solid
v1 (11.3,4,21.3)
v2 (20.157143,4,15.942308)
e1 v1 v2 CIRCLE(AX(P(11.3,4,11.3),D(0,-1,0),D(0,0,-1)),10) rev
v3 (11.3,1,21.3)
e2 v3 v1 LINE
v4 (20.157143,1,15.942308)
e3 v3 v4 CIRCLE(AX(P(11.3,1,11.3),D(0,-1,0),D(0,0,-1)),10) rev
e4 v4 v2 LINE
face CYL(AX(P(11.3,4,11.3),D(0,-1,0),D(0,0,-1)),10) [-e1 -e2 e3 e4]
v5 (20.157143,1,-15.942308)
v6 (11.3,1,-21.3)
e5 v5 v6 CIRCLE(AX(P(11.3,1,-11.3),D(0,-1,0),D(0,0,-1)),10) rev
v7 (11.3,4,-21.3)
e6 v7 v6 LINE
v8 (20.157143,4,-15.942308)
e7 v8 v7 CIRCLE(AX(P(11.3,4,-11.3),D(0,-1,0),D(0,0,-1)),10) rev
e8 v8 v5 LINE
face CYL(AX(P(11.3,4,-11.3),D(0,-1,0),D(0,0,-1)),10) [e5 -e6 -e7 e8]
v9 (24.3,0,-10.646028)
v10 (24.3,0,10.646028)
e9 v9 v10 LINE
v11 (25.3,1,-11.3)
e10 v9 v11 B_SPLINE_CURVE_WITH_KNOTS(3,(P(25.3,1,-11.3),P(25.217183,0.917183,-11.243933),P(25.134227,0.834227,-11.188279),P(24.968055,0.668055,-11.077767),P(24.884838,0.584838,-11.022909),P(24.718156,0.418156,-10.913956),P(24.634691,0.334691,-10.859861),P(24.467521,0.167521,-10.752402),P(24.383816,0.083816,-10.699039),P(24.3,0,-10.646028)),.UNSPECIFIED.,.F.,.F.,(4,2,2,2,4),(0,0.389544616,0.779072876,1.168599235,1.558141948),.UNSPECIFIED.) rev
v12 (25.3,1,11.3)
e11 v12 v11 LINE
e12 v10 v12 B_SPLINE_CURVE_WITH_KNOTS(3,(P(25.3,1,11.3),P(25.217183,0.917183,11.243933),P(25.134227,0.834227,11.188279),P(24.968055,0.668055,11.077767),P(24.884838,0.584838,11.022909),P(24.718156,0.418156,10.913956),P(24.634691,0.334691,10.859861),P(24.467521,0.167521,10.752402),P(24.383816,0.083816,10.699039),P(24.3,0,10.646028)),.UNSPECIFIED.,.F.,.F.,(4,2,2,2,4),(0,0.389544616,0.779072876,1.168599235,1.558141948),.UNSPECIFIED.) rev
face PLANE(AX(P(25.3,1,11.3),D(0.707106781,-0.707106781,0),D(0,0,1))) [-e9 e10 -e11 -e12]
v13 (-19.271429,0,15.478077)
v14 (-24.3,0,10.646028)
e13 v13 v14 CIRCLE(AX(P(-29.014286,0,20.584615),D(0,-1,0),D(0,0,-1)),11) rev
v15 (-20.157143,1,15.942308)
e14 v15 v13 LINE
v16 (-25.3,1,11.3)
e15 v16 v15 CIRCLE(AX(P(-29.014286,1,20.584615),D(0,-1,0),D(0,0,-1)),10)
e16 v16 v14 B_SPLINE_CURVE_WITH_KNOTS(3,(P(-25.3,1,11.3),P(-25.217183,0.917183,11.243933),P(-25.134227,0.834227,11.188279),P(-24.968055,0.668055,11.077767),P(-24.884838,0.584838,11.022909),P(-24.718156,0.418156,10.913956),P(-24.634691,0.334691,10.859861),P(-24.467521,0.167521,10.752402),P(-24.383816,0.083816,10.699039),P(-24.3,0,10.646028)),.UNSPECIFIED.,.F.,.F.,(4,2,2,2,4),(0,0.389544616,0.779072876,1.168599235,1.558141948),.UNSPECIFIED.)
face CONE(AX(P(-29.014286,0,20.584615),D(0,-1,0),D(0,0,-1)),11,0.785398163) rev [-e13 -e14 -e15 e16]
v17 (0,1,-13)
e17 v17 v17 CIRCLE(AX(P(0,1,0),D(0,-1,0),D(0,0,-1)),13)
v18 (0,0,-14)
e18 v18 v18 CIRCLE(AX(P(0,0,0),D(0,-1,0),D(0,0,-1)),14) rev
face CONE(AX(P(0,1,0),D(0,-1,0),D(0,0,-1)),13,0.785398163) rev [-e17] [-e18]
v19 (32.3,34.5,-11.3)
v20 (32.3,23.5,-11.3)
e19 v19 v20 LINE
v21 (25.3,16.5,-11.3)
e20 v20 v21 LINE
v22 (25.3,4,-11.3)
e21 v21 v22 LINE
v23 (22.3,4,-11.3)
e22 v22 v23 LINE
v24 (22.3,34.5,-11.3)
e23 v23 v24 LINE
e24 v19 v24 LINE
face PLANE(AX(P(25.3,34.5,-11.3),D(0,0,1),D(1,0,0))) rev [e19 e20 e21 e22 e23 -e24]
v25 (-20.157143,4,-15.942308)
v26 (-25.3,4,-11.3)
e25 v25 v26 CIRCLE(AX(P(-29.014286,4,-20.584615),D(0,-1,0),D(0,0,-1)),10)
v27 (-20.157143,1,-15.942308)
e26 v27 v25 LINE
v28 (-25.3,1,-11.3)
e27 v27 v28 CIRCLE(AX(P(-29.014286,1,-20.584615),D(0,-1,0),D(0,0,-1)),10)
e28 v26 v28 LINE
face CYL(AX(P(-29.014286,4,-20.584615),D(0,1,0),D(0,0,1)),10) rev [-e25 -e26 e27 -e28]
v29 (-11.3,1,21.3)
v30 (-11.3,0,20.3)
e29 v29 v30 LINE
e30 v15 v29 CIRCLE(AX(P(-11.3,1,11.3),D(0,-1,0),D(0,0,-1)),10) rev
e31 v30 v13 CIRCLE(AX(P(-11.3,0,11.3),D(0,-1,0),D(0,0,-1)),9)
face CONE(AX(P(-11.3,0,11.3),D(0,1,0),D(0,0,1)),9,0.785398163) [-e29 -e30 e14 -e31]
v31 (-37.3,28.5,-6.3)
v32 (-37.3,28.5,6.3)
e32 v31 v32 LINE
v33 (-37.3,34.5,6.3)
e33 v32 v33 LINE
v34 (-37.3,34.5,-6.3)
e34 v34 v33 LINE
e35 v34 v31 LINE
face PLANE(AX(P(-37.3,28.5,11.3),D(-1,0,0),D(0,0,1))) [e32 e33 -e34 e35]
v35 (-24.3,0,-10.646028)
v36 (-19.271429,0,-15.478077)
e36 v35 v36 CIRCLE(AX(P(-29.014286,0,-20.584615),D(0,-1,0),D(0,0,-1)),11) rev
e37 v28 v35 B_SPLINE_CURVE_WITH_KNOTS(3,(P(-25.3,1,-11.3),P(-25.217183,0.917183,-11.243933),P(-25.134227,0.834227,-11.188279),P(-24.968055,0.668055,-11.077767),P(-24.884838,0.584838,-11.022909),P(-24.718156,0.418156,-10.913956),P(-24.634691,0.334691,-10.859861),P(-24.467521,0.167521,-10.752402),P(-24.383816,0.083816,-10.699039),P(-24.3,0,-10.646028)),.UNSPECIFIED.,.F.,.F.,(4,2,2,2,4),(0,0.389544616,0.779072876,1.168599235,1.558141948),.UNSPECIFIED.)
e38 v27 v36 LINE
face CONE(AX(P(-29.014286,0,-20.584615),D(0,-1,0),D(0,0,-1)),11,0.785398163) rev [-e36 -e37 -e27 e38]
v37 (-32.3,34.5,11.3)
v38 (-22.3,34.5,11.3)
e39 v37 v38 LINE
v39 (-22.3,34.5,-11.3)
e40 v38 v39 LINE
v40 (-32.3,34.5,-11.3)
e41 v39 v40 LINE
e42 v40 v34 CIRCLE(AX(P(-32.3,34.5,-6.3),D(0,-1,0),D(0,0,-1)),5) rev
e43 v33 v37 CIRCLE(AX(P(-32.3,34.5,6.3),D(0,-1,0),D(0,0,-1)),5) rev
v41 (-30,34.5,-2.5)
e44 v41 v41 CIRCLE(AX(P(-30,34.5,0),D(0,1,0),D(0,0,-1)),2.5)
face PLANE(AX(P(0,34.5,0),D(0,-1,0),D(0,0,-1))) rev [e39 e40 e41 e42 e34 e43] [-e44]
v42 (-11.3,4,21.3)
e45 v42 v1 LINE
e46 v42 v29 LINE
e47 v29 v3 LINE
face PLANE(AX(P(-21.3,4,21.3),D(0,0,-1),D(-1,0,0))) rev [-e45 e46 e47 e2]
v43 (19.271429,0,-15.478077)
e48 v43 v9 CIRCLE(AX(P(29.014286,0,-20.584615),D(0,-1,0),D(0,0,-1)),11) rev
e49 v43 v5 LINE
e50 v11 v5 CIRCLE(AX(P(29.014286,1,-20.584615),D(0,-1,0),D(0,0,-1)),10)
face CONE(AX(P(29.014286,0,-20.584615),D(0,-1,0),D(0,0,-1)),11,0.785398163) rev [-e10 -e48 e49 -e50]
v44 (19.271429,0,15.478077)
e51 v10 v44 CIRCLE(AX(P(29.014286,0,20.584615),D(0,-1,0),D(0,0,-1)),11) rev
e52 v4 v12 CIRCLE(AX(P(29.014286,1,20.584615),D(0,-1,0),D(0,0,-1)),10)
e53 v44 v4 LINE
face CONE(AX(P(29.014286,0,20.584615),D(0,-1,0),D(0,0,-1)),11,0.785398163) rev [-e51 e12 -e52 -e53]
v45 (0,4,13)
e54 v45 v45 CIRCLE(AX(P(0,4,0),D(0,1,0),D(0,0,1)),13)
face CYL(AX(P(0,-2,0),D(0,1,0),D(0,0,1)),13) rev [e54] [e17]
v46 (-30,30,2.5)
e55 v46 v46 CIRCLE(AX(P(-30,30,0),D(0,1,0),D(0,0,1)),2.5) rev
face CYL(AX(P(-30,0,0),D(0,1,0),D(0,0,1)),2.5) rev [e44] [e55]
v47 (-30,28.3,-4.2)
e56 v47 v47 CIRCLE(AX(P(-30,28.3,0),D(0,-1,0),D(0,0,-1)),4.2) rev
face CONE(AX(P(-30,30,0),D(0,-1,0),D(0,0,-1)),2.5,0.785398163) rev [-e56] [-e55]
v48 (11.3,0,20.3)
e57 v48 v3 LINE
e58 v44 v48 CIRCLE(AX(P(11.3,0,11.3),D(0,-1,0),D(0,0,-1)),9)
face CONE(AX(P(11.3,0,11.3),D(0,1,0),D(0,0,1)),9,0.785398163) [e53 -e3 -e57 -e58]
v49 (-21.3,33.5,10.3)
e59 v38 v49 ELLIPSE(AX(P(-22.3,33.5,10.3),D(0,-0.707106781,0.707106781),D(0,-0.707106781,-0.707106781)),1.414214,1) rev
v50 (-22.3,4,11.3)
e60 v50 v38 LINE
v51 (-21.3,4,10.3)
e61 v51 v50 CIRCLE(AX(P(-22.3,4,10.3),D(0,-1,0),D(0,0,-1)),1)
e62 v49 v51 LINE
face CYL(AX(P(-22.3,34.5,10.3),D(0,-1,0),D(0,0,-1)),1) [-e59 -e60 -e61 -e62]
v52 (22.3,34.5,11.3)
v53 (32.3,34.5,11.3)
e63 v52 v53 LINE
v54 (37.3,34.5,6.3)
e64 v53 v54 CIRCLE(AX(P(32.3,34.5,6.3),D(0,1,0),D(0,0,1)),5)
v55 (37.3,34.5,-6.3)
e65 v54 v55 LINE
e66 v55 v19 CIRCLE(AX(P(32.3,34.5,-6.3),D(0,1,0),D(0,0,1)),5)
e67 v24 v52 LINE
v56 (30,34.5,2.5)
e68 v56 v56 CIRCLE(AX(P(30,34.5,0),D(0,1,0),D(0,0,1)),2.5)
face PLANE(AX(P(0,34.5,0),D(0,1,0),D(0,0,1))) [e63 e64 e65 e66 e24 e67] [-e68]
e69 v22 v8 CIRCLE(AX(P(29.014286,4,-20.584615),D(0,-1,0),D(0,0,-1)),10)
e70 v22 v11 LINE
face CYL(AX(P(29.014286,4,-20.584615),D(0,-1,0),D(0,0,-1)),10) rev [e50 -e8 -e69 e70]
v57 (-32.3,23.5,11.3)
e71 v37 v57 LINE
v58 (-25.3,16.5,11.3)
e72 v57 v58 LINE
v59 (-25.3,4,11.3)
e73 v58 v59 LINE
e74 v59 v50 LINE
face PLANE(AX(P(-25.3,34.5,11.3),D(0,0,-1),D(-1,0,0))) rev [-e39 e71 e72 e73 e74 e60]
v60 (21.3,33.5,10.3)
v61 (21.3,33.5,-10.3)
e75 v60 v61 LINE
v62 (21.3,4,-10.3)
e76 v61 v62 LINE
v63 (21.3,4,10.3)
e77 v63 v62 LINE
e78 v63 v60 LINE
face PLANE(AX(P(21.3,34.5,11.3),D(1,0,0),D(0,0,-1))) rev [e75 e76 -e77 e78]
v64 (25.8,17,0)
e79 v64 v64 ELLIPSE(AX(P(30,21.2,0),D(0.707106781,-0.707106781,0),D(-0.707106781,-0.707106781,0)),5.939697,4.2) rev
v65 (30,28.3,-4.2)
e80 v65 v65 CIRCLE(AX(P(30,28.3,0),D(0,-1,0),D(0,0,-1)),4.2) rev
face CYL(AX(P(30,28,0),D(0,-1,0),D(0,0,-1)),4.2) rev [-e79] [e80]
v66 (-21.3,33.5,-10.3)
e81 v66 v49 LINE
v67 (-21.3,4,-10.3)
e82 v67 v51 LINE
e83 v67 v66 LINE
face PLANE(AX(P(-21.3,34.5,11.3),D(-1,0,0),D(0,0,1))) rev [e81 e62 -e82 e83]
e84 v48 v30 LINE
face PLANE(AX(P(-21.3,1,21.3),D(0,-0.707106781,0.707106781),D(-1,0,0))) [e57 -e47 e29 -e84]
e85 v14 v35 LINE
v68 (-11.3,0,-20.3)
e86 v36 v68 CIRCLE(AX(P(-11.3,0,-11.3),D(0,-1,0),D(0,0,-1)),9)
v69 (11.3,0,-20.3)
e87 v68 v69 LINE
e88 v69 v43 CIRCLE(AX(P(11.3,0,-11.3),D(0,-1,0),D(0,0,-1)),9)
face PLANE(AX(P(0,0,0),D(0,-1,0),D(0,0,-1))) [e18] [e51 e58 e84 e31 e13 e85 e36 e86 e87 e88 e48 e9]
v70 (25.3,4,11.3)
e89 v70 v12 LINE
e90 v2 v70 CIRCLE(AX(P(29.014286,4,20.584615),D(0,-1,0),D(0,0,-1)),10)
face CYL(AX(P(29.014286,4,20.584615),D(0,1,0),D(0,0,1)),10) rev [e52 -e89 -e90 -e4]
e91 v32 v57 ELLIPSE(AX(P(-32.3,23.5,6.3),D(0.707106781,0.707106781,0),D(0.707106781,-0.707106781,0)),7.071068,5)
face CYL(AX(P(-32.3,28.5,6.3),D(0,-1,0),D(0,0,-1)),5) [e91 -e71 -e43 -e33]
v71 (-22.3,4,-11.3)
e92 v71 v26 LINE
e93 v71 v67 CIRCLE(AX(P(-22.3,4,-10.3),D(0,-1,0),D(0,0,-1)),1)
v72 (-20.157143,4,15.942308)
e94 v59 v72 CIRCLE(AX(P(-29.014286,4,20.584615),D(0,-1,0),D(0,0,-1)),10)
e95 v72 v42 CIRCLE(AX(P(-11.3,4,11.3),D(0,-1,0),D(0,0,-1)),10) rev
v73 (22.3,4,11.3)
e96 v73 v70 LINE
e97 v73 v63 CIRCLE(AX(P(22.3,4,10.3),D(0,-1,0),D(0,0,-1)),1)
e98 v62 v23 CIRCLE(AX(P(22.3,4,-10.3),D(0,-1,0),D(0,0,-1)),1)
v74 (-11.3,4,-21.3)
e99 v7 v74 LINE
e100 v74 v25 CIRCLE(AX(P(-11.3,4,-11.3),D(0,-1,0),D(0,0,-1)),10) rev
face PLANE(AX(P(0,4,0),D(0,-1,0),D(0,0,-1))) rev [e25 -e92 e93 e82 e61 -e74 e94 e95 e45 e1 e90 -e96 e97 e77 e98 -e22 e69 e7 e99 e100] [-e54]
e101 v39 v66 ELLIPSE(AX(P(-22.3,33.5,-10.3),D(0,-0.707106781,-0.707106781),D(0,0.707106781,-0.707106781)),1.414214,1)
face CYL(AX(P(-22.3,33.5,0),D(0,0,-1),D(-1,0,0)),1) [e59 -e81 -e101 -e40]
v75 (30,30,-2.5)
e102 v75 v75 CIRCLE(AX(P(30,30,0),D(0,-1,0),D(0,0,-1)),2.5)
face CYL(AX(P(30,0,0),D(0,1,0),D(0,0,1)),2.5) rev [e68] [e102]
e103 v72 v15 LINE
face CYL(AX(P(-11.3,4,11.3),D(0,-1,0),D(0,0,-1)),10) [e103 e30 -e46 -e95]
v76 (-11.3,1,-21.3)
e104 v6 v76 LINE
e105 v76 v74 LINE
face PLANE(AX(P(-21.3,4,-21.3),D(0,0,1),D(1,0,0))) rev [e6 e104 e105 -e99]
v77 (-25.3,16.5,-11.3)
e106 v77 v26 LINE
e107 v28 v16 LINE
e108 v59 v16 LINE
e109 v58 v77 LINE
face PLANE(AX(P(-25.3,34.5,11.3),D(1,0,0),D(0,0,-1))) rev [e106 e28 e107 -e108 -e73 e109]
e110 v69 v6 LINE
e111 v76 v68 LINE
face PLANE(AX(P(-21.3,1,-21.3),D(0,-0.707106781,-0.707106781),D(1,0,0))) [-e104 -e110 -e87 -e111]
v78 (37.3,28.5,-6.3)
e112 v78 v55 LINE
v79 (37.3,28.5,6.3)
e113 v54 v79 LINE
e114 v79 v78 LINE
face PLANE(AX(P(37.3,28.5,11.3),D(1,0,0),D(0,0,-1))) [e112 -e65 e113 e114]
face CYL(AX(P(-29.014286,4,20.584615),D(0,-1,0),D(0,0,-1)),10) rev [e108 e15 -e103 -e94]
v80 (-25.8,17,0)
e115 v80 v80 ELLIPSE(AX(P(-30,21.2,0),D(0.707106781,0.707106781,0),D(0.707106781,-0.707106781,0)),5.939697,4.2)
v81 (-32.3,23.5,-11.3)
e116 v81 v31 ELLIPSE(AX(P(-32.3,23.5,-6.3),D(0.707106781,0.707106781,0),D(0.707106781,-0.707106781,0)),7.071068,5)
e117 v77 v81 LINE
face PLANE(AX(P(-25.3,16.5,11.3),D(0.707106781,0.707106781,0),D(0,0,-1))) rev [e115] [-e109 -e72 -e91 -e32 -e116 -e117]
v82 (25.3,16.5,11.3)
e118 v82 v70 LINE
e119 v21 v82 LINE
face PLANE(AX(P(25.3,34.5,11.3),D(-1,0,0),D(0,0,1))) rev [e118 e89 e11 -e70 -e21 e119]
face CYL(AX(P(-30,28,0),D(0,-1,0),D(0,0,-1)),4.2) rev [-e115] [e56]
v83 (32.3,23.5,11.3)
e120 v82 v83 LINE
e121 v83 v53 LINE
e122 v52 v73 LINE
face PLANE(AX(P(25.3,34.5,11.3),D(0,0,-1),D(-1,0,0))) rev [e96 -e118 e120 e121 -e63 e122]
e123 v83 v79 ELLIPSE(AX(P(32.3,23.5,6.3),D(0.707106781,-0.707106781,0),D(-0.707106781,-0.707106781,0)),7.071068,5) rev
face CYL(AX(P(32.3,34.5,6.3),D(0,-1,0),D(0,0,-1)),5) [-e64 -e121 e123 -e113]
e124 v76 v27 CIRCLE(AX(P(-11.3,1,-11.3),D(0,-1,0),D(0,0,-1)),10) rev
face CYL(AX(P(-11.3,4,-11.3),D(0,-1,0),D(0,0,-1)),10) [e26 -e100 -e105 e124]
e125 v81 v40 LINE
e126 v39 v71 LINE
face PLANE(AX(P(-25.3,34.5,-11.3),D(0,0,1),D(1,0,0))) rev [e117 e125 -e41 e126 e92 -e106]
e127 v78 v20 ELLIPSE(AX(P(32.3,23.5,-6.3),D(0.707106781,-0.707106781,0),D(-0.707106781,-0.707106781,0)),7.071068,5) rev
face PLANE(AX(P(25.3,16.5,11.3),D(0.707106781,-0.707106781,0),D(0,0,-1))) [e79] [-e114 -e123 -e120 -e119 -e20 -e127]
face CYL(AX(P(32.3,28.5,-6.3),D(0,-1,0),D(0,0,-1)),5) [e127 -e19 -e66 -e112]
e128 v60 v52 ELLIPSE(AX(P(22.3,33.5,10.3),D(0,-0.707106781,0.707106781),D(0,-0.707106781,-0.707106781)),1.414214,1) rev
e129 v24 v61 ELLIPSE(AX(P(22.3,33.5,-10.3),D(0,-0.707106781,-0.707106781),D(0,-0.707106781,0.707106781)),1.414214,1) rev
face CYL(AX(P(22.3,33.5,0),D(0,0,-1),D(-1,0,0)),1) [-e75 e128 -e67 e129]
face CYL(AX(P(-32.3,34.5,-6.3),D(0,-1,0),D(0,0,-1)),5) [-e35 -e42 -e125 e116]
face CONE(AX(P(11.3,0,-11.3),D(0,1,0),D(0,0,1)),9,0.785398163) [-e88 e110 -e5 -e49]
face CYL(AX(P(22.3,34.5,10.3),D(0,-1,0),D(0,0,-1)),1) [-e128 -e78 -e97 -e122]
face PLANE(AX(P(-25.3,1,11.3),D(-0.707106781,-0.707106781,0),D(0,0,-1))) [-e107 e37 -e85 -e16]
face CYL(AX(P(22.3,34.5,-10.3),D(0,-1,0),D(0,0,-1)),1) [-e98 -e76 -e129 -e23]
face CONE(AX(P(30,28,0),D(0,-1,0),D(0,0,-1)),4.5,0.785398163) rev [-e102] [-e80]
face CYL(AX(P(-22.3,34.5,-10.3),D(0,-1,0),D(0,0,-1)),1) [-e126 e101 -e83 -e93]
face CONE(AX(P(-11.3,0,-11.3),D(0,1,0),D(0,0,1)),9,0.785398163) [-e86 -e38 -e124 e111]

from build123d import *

# Parameters (mm, degrees)
SKETCH_1_W            = 42.6
SKETCH_1_H            = 42.6
EXTRUDE_1_DEPTH       = 4
SKETCH_2_R            = 13
CUT_EXTRUDE_1_DEPTH   = 6
FILLET_1_R            = 10
SKETCH_3_W            = 4
SKETCH_3_H            = 22.6
EXTRUDE_2_DEPTH       = 34.5
FILLET_2_R            = 10
SKETCH_4_W            = 12
SKETCH_4_H            = 22.6
EXTRUDE_3_DEPTH       = 6
FILLET_3_R            = 5
FILLET_4_R            = 1
CHAMFER_3_SIZE        = 1
SKETCH_5_R            = 2.5
CUT_EXTRUDE_2_DEPTH   = 56.092921505
CHAMFER_START         = -9.101924
CHAMFER_4_DEPTH       = 6.602294476
CHAMFER_START_2       = 2.5000001
CHAMFER_4_2_DEPTH     = 6.6019239
CHAMFER_START_3       = -2.499629524
CHAMFER_4_3_DEPTH     = 4.999629624
CHAMFER_START_4       = -11.3
CHAMFER_4_4_DEPTH     = 2.198076
CHAMFER_START_5       = 9.101924
CHAMFER_4_5_DEPTH     = 2.198076
CHAMFER_START_6       = 16.5
CHAMFER_4_6_OUTLINE_R = 2.5
CHAMFER_4_6_DEPTH     = 12
SKETCH_6_R            = 4.2
CUT_EXTRUDE_5_DEPTH   = 28


with BuildPart() as part:
    # Эскиз1 → Бобышка-Вытянуть1 (new body)
    with BuildSketch(Plane(origin=(0, 0, 0), x_dir=(1, 0, 0), z_dir=(0, 1, 0))):
        Rectangle(SKETCH_1_W, SKETCH_1_H)
    extrude(amount=EXTRUDE_1_DEPTH)

    # Эскиз2 → Вырез-Вытянуть1 (cut)
    with BuildSketch(Plane(origin=(0, 4, 0), x_dir=(1, 0, 0), z_dir=(0, 1, 0))):
        with Locations(Location((0, 0, 0), (0, 0, 270))):
            Circle(SKETCH_2_R)
    extrude(amount=-CUT_EXTRUDE_1_DEPTH, mode=Mode.SUBTRACT)

    # Скругление1
    fillet_1_edges = [part.edges().sort_by_distance(p)[0] for p in [
        (21.3, 2, 21.3),
        (-21.3, 2, 21.3),
        (-21.3, 2, -21.3),
        (21.3, 2, -21.3),
    ]]
    fillet(fillet_1_edges, radius=FILLET_1_R)

    # Эскиз3 → Бобышка-Вытянуть2 (add)
    with BuildSketch(Plane(origin=(0, 0, 0), x_dir=(1, 0, 0), z_dir=(0, 1, 0))):
        with Locations((-23.3, 0)):
            Rectangle(SKETCH_3_W, SKETCH_3_H)
        with Locations((23.3, 0)):
            Rectangle(SKETCH_3_W, SKETCH_3_H)
    extrude(amount=EXTRUDE_2_DEPTH)

    # Скругление2
    # the kernel refuses this fillet: 10 mm, written as the material it adds along each edge
    with BuildSketch(Plane(origin=(21.3, 0, -11.3), x_dir=(-0.23904572186687842, 0, -0.9710083124552246), z_dir=(0, 1, 0)), Plane(origin=(-21.3, 0, 11.3), x_dir=(0.2390457218668792, 0, 0.9710083124552243), z_dir=(0, 1, 0))) as fillet_2_piece_1:
        with BuildLine():
            CenterArc((7.171371656, -9.710083125), FILLET_2_R, 103.83022495, 40.535802111)
            Line((-0.956182887, -3.88403325), (0, 0))
            ThreePointArc((0, 0), (2.390457219, -0.289916875), (4.780914437, 0))
        make_face()
    extrude(amount=4)
    with BuildSketch(Plane(origin=(-21.3, 0, -11.3), x_dir=(0.23904572186687842, 0, -0.9710083124552246), z_dir=(0, 1, 0)), Plane(origin=(21.3, 0, 11.3), x_dir=(-0.2390457218668792, 0, 0.9710083124552243), z_dir=(0, 1, 0))) as fillet_2_piece_2:
        with BuildLine():
            CenterArc((7.171371656, 9.710083125), FILLET_2_R, 215.633972939, 40.535802111)
            Line((-0.956182887, 3.88403325), (0, 0))
            ThreePointArc((0, 0), (2.390457219, 0.289916875), (4.780914437, 0))
        make_face()
    extrude(amount=4)

    # Эскиз4 → Бобышка-Вытянуть3 (add)
    with BuildSketch(Plane(origin=(0, 34.5, 0), x_dir=(1, 0, 0), z_dir=(0, 1, 0))):
        with Locations((-31.3, 0)):
            Rectangle(SKETCH_4_W, SKETCH_4_H)
        with Locations((31.3, 0)):
            Rectangle(SKETCH_4_W, SKETCH_4_H)
    extrude(amount=-EXTRUDE_3_DEPTH)

    # Скругление3
    fillet_3_edges = [part.edges().sort_by_distance(p)[0] for p in [
        (37.3, 31.5, -11.3),
        (37.3, 31.5, 11.3),
        (-37.3, 31.5, 11.3),
        (-37.3, 31.5, -11.3),
    ]]
    fillet(fillet_3_edges, radius=FILLET_3_R)

    # Скругление4
    fillet_4_edges = [part.edges().sort_by_distance(p)[0] for p in [
        (21.3, 19.25, -11.3),
        (21.3, 19.25, 11.3),
        (21.3, 34.5, 0),
        (-21.3, 19.25, 11.3),
        (-21.3, 19.25, -11.3),
        (-21.3, 34.5, 0),
    ]]
    fillet(fillet_4_edges, radius=FILLET_4_R)

    # Фаска3
    chamfer_3_edges = [part.edges().sort_by_distance(p)[0] for p in [
        (0, 0, -13),
        (0, 0, 21.3),
        (0, 0, -21.3),
        (16.475757114, 0, -19.856374133),
        (-16.475757114, 0, 19.856374133),
        (25.3, 0, 0),
        (-25.3, 0, 0),
        (-16.475757114, 0, -19.856374133),
        (16.475757114, 0, 19.856374133),
        (22.313691772, 0, -13.16154043),
        (-22.313691772, 0, -13.16154043),
        (-22.313691772, 0, 13.16154043),
        (22.313691772, 0, 13.16154043),
    ]]
    chamfer(chamfer_3_edges, length=CHAMFER_3_SIZE)

    # Эскиз5 → Вырез-Вытянуть2 (cut, through all)
    with BuildSketch(Plane(origin=(0, 34.5, 0), x_dir=(1, 0, 0), z_dir=(0, 1, 0))):
        with Locations(Location((30, 0, 0), (0, 0, 270))):
            Circle(SKETCH_5_R)
        with Locations(Location((-30, 0, 0), (0, 0, 90))):
            Circle(SKETCH_5_R)
    extrude(amount=-CUT_EXTRUDE_2_DEPTH, mode=Mode.SUBTRACT)

    # Фаска4: read off the stored shape, not the designer's step
    # Фаска4 outline → Фаска4 (add)
    with BuildSketch(Plane.XY.offset(CHAMFER_START)):
        Polygon((-37.3, 28.5), (-25.3, 16.5), (-25.3, 28.5), align=None)
        Polygon((25.3, 28.5), (25.3, 16.5), (37.3, 28.5), align=None)
    extrude(amount=CHAMFER_4_DEPTH)

    # Chamfer 4 2 outline → Chamfer 4 2 (add)
    with BuildSketch(Plane.XY.offset(CHAMFER_START_2)):
        Polygon((-37.3, 28.5), (-25.3, 16.5), (-25.3, 28.5), align=None)
        Polygon((25.3, 28.5), (25.3, 16.5), (37.3, 28.5), align=None)
    extrude(amount=CHAMFER_4_2_DEPTH)

    # Chamfer 4 3 outline → Chamfer 4 3 (add)
    with BuildSketch(Plane.XY.offset(CHAMFER_START_3)):
        Polygon((-37.3, 28.5), (-25.3, 16.5), (-25.3, 28.5), align=None)
        Polygon((25.3, 28.5), (25.3, 16.5), (37.3, 28.5), align=None)
    extrude(amount=CHAMFER_4_3_DEPTH)

    # Chamfer 4 4 outline → Chamfer 4 4 (add)
    with BuildSketch(Plane.XY.offset(CHAMFER_START_4)):
        Polygon((-37.3, 28.5), (-25.3, 16.5), (-25.3, 28.5), align=None)
        Polygon((25.3, 28.5), (25.3, 16.5), (37.3, 28.5), align=None)
    extrude(amount=CHAMFER_4_4_DEPTH)

    # Chamfer 4 5 outline → Chamfer 4 5 (add)
    with BuildSketch(Plane.XY.offset(CHAMFER_START_5)):
        Polygon((-37.3, 28.5), (-25.3, 16.5), (-25.3, 28.5), align=None)
        Polygon((25.3, 28.5), (25.3, 16.5), (37.3, 28.5), align=None)
    extrude(amount=CHAMFER_4_5_DEPTH)

    # Chamfer 4 6 outline → Chamfer 4 6 (cut)
    with BuildSketch(Plane(origin=(0, 0, 0), x_dir=(1, 0, 0), z_dir=(0, 1, 0)).offset(CHAMFER_START_6)):
        with BuildLine():
            Line((37.299999999, -11.3), (37.3, -6.3))
            ThreePointArc((37.3, -6.3), (35.835533906, -9.835533906), (32.3, -11.3))
            Line((32.3, -11.3), (37.299999999, -11.3))
        make_face()
        with BuildLine():
            ThreePointArc((32.3, 11.3), (35.835533906, 9.835533906), (37.3, 6.3))
            Line((37.3, 6.3), (37.299999999, 11.3))
            Line((37.299999999, 11.3), (32.3, 11.3))
        make_face()
        with BuildLine():
            Line((-37.3, -11.3), (-32.3, -11.3))
            ThreePointArc((-32.3, -11.3), (-35.835533906, -9.835533906), (-37.3, -6.3))
            Line((-37.3, -6.3), (-37.3, -11.3))
        make_face()
        with BuildLine():
            ThreePointArc((-37.3, 6.3), (-35.835533906, 9.835533906), (-32.3, 11.3))
            Line((-32.3, 11.3), (-37.3, 11.3))
            Line((-37.3, 11.3), (-37.3, 6.3))
        make_face()
        with Locations((-30, 0)):
            Circle(CHAMFER_4_6_OUTLINE_R)
        with Locations((30, 0)):
            Circle(CHAMFER_4_6_OUTLINE_R)
    extrude(amount=CHAMFER_4_6_DEPTH, mode=Mode.SUBTRACT)

    # Эскиз6 → Вырез-Вытянуть5 (cut)
    with BuildSketch(Plane.XZ):
        with Locations(Location((30, 0, 0), (0, 0, 270))):
            Circle(SKETCH_6_R)
        with Locations((-30, 0)):
            Circle(SKETCH_6_R)
    extrude(amount=-CUT_EXTRUDE_5_DEPTH, mode=Mode.SUBTRACT)

    # Фаска5
    # the kernel refuses this chamfer: 2 mm, written as the material it takes off along each edge
    with BuildSketch(Plane(origin=(30, 28, 0), x_dir=(1, 0, 0), z_dir=(0, 0, -1))) as chamfer_5_piece_1_section:
        with BuildLine():
            Line((4.556568542, 0.056568542), (2.443431458, -2.056568542))
            Line((2.443431458, -2.056568542), (2.403431458, -2.056568542))
            ThreePointArc((2.403431458, -2.056568542), (2.46, -1.028284271), (2.46, 0))
            Line((2.46, 0), (2.5, 0.04))
            ThreePointArc((2.5, 0.04), (3.528284271, 0.04), (4.556568542, 0.096568542))
            Line((4.556568542, 0.096568542), (4.556568542, 0.056568542))
        make_face()
    chamfer_5_piece_1 = revolve(axis=Axis((30, 28, 0), (0, -1, 0)), mode=Mode.PRIVATE)
    chamfer_5_piece_1 = chamfer_5_piece_1 & Plane(origin=(30, 28, 0), x_dir=(0, 0, -1), z_dir=(0, -1, 0)) * Cylinder(4.2, 19, mode=Mode.PRIVATE)
    add(chamfer_5_piece_1, mode=Mode.SUBTRACT)
    with BuildSketch(Plane(origin=(-30, 28, 0), x_dir=(1, 0, 0), z_dir=(0, 0, -1))) as chamfer_5_piece_2_section:
        with BuildLine():
            Line((2.443431458, -2.056568542), (4.556568542, 0.056568542))
            Line((4.556568542, 0.056568542), (4.556568542, 0.096568542))
            ThreePointArc((4.556568542, 0.096568542), (3.528284271, 0.04), (2.5, 0.04))
            Line((2.5, 0.04), (2.46, 0))
            ThreePointArc((2.46, 0), (2.46, -1.028284271), (2.403431458, -2.056568542))
            Line((2.403431458, -2.056568542), (2.443431458, -2.056568542))
        make_face()
    chamfer_5_piece_2 = revolve(axis=Axis((-30, 28, 0), (0, -1, 0)), mode=Mode.PRIVATE)
    chamfer_5_piece_2 = chamfer_5_piece_2 & Plane(origin=(-30, 28, 0), x_dir=(1, 0, 0), z_dir=(0, -1, 0)) * Cylinder(4.2, 19, mode=Mode.PRIVATE)
    add(chamfer_5_piece_2, mode=Mode.SUBTRACT)


solid = part.part
